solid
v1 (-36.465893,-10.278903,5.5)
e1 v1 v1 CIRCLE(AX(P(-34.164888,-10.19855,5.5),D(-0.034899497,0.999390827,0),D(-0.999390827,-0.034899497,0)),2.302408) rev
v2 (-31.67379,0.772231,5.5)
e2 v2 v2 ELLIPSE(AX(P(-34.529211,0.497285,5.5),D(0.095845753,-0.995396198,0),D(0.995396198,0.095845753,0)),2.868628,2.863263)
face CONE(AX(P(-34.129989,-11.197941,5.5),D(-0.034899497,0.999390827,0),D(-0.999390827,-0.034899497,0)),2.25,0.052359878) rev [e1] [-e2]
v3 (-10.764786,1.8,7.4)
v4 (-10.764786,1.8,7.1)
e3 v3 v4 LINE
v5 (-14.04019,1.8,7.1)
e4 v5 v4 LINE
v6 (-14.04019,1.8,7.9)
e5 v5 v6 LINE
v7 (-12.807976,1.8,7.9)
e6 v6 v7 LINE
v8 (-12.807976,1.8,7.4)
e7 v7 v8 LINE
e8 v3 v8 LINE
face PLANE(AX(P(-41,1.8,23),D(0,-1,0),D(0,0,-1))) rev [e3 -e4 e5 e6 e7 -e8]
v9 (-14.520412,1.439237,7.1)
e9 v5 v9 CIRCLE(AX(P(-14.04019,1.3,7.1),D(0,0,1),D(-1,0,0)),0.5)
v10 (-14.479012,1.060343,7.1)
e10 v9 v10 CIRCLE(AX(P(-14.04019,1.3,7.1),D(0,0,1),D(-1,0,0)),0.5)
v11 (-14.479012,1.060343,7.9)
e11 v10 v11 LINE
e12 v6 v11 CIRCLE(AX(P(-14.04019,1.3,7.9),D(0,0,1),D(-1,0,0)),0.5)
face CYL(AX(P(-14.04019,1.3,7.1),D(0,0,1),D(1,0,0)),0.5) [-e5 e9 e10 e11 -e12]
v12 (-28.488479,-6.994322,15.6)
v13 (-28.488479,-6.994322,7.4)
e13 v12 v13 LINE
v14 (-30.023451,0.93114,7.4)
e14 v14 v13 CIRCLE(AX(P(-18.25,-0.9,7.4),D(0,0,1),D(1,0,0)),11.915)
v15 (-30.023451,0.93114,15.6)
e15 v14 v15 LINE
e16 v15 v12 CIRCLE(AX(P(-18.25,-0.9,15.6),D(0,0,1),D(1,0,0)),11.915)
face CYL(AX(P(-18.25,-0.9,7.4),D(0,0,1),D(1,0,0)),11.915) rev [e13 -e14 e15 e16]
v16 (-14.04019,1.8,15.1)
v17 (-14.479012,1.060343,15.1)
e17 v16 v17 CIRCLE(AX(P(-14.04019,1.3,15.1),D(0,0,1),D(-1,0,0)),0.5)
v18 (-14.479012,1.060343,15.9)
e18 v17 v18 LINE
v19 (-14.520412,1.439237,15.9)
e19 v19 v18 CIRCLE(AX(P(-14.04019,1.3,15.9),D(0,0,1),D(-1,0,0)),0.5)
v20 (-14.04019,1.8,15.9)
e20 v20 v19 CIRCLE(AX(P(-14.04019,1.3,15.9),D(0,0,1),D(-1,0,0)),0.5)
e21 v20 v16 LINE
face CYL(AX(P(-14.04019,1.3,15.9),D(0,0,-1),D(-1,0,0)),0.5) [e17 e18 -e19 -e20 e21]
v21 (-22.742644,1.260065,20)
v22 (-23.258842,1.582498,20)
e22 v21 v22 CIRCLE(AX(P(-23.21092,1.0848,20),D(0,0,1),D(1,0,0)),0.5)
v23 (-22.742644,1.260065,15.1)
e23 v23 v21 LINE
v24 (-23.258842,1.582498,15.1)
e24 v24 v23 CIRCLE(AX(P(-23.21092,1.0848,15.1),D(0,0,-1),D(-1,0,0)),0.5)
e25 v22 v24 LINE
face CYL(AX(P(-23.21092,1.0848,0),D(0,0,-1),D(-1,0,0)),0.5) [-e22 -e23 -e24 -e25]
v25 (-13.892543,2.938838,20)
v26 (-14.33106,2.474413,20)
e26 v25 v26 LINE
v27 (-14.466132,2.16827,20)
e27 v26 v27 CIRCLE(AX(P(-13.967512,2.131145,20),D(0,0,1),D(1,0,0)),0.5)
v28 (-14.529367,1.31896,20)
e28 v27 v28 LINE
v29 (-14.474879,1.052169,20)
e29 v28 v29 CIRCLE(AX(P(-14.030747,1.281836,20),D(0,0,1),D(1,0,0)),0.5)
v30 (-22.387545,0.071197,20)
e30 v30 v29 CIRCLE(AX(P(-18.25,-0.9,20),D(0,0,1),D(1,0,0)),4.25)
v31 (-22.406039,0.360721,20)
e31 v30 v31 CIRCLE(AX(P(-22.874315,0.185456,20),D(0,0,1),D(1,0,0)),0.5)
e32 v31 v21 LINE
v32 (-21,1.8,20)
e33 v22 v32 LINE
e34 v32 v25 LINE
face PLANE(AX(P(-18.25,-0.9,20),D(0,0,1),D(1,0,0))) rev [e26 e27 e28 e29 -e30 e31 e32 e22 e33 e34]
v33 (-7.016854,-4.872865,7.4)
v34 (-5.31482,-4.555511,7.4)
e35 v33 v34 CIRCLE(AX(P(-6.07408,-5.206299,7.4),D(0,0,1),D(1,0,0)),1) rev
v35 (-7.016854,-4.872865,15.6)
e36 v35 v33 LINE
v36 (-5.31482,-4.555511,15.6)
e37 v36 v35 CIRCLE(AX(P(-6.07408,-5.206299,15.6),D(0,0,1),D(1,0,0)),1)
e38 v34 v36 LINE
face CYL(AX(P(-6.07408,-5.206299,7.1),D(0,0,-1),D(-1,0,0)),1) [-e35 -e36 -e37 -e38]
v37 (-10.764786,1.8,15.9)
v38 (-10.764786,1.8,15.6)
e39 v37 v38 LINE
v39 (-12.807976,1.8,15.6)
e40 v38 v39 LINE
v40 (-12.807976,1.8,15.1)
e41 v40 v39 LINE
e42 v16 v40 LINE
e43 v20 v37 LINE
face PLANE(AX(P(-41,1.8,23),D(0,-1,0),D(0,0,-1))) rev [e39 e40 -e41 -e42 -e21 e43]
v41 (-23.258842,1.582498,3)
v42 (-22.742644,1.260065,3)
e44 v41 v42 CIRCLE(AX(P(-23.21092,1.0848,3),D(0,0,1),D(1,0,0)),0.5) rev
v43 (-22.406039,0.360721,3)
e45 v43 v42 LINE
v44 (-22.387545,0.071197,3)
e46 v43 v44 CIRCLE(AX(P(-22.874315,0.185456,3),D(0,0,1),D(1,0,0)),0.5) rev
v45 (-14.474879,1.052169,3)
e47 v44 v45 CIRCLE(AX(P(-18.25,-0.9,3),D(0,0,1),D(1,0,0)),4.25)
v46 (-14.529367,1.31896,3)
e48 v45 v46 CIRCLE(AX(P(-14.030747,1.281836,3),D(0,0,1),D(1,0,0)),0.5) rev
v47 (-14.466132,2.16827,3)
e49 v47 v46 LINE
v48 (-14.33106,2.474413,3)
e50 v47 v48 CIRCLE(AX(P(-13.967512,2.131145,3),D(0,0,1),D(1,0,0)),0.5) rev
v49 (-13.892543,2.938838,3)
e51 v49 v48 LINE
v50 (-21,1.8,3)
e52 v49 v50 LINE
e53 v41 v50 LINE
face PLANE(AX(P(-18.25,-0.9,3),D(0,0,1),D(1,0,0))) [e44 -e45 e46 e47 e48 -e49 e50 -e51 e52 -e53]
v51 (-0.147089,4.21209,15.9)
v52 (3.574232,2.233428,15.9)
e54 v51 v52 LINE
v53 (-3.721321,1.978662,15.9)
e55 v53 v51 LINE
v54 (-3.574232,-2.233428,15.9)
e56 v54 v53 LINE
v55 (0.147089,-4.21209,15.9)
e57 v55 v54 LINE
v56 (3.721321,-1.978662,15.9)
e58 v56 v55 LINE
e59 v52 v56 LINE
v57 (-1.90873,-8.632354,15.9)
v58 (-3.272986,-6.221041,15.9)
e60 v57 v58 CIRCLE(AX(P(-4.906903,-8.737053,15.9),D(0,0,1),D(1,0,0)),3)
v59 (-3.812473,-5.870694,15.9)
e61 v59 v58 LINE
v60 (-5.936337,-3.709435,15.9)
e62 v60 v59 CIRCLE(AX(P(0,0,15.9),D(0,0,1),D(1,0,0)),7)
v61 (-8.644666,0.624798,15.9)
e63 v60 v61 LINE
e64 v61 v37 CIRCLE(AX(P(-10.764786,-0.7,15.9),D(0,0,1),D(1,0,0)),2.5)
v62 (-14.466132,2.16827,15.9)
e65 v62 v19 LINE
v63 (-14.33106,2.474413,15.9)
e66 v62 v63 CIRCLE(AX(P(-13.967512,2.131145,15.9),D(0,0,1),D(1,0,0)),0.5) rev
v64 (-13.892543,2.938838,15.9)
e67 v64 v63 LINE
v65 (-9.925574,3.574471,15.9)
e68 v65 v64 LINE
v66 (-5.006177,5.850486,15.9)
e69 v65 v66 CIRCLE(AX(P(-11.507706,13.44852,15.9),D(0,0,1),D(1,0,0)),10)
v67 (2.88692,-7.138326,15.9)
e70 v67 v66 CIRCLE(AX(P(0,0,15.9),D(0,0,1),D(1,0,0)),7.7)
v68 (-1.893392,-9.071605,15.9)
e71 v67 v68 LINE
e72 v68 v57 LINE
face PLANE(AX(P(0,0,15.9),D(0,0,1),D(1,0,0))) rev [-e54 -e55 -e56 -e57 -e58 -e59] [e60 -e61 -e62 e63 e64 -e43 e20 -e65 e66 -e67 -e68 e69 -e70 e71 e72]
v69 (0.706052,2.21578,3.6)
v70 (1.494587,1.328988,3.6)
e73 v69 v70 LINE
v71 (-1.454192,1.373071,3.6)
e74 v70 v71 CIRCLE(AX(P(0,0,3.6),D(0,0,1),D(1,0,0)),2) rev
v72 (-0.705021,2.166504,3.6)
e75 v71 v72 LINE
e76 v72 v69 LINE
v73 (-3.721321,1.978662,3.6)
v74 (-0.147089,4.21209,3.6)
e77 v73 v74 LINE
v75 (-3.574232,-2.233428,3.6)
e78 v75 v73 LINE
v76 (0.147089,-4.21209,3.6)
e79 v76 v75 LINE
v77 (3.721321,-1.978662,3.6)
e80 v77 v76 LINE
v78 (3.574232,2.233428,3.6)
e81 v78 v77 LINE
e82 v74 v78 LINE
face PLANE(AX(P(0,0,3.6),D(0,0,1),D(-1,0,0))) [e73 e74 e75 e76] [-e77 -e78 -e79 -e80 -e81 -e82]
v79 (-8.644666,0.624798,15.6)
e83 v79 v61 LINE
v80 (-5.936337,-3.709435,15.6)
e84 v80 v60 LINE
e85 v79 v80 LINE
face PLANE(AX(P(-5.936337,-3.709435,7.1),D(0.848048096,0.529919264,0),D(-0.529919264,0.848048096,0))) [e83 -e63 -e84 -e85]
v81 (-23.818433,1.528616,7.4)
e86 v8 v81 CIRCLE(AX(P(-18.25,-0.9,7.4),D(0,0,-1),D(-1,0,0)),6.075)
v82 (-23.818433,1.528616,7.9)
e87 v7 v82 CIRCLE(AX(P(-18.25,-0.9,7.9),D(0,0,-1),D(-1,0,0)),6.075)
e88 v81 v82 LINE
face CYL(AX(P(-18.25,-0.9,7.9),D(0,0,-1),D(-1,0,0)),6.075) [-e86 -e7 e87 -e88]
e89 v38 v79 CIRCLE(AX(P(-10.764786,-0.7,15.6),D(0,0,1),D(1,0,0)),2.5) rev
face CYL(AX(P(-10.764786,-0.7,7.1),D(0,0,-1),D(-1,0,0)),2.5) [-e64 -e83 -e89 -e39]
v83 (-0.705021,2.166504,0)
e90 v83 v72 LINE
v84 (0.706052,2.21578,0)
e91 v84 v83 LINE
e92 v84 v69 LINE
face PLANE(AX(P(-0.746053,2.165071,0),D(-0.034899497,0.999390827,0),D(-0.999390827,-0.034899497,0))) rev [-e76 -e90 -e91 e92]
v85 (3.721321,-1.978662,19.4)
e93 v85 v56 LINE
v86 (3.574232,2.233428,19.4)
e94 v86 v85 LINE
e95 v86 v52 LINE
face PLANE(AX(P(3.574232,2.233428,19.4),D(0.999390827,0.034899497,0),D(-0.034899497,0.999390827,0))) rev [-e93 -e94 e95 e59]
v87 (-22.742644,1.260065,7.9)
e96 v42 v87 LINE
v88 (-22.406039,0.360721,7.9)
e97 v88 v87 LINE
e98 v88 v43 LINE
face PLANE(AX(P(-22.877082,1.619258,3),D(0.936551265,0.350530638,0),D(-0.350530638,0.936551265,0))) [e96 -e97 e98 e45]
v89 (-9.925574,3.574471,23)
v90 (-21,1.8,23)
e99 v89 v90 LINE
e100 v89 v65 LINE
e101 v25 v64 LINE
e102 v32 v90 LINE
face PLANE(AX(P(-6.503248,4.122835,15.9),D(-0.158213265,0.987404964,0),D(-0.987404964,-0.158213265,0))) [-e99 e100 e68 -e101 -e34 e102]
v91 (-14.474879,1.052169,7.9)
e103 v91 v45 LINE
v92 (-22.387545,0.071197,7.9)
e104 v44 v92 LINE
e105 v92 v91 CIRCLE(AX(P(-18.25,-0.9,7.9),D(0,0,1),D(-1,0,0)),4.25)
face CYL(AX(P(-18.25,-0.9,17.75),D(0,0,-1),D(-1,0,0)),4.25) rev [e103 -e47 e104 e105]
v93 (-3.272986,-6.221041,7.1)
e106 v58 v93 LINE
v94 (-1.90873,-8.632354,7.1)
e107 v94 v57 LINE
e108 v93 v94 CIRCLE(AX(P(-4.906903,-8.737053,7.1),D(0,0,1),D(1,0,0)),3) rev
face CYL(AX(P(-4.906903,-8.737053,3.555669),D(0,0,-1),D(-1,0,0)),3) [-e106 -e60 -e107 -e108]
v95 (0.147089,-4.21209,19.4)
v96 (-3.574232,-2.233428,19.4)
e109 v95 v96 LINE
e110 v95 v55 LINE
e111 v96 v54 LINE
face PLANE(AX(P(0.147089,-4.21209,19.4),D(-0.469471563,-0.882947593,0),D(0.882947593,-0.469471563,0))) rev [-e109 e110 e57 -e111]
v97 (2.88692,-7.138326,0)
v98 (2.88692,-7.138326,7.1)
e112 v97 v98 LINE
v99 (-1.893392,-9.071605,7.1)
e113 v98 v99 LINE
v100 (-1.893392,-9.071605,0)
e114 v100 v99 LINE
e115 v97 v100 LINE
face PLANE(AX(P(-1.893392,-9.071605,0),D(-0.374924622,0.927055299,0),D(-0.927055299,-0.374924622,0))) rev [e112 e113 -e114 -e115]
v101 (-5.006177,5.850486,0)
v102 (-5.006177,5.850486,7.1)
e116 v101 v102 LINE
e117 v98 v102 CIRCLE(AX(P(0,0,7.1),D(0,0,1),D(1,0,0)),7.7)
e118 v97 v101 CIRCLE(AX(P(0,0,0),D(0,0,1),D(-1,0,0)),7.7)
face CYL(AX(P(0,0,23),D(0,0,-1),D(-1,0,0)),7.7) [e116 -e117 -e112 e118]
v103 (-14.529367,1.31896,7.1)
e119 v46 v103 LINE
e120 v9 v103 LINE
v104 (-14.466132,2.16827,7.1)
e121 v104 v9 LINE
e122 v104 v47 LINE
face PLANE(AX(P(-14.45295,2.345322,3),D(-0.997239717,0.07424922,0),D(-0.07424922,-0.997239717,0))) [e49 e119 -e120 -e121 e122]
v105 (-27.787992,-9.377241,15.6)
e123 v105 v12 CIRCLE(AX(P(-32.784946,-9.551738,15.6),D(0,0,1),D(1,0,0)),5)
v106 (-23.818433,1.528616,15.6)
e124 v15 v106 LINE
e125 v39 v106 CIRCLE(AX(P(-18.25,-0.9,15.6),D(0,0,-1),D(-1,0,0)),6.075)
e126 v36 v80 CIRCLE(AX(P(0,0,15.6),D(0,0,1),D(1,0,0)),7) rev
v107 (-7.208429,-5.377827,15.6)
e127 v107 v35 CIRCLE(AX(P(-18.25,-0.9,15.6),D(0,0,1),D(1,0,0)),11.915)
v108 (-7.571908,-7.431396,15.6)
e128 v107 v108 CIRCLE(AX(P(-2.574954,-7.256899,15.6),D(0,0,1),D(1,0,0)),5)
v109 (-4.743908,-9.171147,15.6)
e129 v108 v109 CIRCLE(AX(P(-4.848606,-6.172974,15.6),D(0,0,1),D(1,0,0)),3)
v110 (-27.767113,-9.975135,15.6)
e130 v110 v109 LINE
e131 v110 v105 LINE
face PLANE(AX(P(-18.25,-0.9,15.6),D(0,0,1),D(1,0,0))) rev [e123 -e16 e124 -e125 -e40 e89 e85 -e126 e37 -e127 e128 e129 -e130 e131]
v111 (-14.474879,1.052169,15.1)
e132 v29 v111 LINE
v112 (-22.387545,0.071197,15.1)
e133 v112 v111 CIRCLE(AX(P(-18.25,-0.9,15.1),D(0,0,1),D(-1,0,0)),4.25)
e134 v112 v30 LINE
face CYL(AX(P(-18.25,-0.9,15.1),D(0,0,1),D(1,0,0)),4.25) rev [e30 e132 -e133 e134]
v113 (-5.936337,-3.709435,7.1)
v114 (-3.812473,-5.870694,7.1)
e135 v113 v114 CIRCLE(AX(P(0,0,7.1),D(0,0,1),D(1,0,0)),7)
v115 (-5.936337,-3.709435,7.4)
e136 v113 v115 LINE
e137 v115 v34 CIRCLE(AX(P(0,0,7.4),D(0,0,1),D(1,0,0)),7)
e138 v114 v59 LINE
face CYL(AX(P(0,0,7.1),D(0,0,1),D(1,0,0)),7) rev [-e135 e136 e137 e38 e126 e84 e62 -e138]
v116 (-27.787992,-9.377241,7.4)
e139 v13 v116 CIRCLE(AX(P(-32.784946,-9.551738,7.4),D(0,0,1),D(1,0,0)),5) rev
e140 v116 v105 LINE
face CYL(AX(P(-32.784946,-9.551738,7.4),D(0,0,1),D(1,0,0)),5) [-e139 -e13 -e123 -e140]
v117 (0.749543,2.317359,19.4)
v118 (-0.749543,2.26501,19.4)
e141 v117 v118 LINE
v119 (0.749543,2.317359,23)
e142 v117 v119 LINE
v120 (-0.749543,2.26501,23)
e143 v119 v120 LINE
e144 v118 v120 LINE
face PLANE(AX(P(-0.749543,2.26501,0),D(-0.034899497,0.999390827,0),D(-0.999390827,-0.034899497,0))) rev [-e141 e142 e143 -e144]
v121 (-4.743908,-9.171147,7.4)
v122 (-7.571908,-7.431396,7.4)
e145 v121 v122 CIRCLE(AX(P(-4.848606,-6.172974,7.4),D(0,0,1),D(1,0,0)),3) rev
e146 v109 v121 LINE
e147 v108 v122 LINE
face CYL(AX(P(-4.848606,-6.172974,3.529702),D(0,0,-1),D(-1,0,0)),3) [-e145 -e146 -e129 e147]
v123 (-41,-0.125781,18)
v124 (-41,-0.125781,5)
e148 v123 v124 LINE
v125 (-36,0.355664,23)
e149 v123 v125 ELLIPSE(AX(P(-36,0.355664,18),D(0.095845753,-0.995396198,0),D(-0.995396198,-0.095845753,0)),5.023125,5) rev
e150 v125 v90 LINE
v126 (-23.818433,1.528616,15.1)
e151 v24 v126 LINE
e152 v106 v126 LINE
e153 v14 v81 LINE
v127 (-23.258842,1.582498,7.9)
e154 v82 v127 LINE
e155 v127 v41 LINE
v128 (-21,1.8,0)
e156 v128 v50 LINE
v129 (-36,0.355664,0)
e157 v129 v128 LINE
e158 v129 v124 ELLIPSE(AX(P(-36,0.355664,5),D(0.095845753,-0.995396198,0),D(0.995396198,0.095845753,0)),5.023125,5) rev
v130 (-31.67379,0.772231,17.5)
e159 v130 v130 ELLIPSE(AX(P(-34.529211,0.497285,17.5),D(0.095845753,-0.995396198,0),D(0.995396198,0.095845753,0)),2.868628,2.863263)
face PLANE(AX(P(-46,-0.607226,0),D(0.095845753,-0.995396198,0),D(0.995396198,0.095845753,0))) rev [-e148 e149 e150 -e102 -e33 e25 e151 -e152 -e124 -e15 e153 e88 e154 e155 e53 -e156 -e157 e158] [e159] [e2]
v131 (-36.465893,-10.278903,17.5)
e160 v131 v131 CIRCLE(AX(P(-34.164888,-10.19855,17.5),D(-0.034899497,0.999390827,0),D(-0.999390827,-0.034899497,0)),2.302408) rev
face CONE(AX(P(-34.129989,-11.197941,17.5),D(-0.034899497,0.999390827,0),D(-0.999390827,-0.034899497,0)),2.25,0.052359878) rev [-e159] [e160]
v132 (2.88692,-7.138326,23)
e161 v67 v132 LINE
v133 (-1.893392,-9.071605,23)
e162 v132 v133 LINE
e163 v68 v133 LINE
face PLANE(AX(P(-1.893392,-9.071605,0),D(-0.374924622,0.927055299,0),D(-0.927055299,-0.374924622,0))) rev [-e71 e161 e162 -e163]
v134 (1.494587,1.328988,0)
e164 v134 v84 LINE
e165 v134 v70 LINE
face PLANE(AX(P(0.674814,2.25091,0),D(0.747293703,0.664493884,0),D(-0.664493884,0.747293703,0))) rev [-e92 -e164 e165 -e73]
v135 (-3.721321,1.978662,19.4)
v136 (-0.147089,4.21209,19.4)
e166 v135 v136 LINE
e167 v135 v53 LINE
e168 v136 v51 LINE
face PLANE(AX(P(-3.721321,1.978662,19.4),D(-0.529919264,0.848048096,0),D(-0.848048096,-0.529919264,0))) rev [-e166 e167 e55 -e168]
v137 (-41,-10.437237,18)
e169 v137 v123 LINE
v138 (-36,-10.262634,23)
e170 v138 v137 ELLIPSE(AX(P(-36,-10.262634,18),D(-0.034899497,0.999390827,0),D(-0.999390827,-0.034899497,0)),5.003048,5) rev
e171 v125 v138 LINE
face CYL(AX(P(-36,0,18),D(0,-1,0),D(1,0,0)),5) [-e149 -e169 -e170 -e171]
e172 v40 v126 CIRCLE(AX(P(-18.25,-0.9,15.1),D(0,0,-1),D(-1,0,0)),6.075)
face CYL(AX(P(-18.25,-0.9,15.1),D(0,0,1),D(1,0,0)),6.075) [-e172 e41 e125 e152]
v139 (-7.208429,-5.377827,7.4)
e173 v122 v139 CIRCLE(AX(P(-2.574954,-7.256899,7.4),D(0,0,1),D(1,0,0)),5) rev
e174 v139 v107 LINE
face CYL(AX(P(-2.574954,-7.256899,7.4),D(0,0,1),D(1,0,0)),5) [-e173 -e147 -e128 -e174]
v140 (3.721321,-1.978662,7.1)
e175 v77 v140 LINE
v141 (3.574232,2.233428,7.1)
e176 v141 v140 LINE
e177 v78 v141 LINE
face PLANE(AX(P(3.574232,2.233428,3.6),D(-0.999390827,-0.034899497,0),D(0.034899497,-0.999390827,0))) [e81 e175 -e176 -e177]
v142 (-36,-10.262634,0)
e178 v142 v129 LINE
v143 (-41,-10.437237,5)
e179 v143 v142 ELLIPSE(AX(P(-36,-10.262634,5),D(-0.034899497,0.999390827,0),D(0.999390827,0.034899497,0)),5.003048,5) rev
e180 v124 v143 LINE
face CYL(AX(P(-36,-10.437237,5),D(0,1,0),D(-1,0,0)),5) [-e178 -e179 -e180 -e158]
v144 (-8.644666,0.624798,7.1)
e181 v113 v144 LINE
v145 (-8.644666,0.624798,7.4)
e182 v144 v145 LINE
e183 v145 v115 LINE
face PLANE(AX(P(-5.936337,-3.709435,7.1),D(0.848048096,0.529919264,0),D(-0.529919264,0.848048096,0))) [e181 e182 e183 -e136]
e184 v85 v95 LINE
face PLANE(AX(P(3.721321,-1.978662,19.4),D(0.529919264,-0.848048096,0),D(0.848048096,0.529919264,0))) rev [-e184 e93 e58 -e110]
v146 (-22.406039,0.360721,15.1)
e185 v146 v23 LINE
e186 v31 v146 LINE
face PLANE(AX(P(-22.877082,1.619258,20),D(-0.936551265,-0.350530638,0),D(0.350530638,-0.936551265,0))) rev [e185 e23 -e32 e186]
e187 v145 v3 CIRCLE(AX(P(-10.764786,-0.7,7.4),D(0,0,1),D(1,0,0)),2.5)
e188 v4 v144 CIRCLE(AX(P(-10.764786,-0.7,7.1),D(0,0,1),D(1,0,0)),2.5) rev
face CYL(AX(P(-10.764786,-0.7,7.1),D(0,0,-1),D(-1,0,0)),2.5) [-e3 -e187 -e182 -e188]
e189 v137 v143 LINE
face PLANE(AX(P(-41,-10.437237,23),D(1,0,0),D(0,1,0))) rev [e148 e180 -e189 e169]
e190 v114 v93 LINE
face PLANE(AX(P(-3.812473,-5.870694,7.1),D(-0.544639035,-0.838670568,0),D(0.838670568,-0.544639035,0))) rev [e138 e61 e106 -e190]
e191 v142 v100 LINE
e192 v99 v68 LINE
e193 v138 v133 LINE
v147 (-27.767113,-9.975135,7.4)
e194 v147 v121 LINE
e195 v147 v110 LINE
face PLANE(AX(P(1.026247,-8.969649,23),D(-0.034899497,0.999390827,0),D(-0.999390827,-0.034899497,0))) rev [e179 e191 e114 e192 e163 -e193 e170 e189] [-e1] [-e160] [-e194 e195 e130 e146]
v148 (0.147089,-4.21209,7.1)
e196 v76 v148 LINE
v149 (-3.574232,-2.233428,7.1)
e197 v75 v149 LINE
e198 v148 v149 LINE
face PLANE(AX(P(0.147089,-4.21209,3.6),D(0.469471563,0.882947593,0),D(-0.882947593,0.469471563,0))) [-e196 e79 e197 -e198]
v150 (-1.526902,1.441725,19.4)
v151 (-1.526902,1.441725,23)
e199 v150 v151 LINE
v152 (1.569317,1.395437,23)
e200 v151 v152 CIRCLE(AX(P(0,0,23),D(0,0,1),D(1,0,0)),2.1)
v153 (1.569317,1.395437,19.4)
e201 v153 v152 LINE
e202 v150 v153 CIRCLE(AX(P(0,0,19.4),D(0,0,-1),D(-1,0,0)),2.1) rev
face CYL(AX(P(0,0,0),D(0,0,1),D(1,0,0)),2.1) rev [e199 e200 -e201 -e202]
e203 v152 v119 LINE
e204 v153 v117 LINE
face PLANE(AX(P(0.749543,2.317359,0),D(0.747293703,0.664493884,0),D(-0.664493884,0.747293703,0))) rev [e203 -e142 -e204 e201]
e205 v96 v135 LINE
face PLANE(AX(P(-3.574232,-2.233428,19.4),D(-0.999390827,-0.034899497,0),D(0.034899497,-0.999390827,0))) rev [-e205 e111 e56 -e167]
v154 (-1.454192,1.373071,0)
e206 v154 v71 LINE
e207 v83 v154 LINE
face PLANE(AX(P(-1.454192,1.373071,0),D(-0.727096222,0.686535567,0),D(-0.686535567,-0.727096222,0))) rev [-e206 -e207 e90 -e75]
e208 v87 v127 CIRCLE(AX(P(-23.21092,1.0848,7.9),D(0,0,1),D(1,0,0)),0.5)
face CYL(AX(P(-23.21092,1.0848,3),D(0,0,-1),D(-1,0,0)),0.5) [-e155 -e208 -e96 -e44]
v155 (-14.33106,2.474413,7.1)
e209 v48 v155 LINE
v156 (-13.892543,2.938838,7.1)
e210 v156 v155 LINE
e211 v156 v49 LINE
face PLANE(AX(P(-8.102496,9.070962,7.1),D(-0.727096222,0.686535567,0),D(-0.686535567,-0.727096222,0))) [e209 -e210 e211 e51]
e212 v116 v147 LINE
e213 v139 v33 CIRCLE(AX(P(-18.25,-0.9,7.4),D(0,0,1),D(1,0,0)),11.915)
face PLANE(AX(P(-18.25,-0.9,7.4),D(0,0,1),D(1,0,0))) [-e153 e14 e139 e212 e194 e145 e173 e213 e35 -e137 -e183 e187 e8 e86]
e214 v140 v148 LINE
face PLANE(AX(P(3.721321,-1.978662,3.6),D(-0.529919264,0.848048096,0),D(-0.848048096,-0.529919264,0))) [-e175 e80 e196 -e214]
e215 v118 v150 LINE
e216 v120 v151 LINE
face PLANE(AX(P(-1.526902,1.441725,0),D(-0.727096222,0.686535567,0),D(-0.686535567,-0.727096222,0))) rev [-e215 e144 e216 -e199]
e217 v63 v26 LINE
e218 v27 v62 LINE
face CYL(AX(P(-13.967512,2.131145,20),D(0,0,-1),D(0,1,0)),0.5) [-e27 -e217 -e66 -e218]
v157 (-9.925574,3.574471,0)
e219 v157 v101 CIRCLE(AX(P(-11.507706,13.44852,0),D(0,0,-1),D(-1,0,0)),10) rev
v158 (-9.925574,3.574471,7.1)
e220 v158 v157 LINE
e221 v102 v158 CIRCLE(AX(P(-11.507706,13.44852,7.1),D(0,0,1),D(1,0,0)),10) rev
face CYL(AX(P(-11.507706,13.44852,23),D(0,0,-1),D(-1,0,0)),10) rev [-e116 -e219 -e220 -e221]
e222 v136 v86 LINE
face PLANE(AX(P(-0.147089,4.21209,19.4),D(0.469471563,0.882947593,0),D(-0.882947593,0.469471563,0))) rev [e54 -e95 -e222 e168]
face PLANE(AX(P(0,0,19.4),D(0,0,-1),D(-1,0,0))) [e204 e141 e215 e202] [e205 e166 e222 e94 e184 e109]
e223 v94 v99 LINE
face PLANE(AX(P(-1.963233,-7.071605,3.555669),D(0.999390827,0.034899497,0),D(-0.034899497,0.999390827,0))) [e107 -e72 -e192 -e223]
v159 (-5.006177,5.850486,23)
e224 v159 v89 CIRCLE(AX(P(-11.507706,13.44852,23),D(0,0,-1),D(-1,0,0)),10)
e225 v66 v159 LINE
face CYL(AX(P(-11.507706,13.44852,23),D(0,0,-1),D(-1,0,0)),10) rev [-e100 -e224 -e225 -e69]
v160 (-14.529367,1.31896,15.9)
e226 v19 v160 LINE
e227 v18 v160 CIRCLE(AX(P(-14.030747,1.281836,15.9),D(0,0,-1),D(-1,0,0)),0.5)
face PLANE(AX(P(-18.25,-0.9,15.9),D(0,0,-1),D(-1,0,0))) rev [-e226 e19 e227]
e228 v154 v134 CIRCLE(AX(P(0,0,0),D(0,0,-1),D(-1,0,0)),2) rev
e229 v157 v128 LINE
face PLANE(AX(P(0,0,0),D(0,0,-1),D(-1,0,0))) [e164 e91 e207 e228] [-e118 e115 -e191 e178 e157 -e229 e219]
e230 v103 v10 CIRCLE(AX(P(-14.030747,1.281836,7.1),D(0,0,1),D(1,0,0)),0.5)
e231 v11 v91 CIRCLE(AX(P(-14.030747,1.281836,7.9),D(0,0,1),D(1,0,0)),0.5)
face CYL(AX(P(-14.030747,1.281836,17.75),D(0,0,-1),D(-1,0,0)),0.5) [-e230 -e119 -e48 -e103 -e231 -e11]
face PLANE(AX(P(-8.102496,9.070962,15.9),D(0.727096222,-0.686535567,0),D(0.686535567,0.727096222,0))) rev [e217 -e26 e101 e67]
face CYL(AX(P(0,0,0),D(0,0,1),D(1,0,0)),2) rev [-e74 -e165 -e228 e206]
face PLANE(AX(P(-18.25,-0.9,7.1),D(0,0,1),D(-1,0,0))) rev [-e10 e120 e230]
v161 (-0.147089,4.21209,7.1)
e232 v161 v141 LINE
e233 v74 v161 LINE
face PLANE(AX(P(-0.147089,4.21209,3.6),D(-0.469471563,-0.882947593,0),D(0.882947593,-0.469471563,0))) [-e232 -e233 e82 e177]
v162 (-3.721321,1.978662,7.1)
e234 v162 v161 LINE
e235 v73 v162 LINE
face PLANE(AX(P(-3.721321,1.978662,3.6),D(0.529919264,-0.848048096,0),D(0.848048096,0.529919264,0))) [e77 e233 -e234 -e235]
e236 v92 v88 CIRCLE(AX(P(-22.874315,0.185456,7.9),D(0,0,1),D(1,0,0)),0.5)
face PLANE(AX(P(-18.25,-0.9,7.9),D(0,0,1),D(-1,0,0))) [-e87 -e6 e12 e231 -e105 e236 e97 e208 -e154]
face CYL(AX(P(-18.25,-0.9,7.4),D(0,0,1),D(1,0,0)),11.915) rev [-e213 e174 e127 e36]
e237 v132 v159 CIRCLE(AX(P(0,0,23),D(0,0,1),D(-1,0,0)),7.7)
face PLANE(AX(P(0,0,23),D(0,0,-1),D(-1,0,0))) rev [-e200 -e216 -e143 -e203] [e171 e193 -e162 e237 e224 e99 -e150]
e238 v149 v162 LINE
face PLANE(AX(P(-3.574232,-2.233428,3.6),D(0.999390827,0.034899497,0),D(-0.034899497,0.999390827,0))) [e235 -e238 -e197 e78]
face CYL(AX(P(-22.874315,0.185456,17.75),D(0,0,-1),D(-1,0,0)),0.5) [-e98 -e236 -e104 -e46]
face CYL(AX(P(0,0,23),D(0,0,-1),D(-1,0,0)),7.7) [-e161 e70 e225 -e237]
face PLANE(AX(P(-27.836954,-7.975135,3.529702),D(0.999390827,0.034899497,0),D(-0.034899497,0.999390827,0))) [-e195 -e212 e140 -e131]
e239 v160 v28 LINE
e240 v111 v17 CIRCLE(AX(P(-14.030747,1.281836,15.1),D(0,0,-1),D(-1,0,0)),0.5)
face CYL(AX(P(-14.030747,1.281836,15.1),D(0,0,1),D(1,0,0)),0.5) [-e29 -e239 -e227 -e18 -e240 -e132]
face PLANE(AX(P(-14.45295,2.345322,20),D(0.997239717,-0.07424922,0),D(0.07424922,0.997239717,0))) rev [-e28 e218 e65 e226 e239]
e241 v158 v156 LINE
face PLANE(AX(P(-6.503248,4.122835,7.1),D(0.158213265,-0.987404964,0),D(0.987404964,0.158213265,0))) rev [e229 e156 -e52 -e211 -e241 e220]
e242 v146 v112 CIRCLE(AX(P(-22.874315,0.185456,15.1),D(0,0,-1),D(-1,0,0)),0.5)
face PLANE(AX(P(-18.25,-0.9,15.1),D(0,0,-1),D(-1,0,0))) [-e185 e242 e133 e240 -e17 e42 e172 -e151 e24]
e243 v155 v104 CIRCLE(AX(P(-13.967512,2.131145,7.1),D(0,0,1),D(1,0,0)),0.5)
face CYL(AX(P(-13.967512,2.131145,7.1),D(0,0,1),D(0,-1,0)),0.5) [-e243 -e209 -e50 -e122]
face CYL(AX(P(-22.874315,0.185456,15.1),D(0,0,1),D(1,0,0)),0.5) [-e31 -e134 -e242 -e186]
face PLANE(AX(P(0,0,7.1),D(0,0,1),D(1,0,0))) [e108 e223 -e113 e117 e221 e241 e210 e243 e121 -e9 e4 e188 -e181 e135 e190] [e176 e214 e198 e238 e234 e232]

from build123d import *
from build123d.topology import SkipClean

# Parameters (mm, degrees)
SALIENTE_EXTRUIR1_DEPTH         = 23
CORTAR_EXTRUIR1_DEPTH           = 4.4
CROQUIS4_R                      = 2.1
CORTAR_EXTRUIR3_DEPTH           = 49.155331227
CORTAR_EXTRUIR11_DEPTH          = 49.155331227
CROQUIS5_R                      = 11.915
CORTAR_EXTRUIR4_DEPTH           = 4.1
SALIENTE_EXTRUIR2_DEPTH         = 0.5
CROQUIS7_R                      = 4.25
CORTAR_EXTRUIR5_DEPTH           = 6.25
CORTAR_EXTRUIR7_DEPTH           = 3.5
CROQUIS10_R                     = 2.25
CORTAR_EXTRUIR8_DEPTH           = 53.746474455
CORTAR_EXTRUIR8_DRAFT           = -3
CORTAR_EXTRUIR8_PROFILE_2_DEPTH = 53.746474455
CORTAR_EXTRUIR8_PROFILE_2_DRAFT = -3
REDONDEO1_R                     = 5
REDONDEO2_R                     = 2.5
REDONDEO7_R                     = 5
REDONDEO11_R                    = 1
CORTAR_EXTRUIR13_DEPTH          = 8.8
REDONDEO12_R                    = 3
CORTAR_EXTRUIR14_DEPTH          = 8.2
REDONDEO13_R                    = 5
MOVER_CARA1_BY                  = 0.1
MOVER_CARA1_2_BY                = 0.1
MOVER_CARA1_3_BY                = 0.1
MOVER_CARA1_4_BY                = 0.1
CORTAR_EXTRUIR16_DEPTH          = 8.5
CORTAR_EXTRUIR21_DEPTH          = 49.155331227
REDONDEO18_R                    = 3
CORTAR_EXTRUIR24_DEPTH          = 49.155331227
SALIENTE_EXTRUIR10_DEPTH        = 7.1
CROQUIS40_W                     = 6.032148686
CROQUIS40_H                     = 4.1
CORTAR_EXTRUIR25_DEPTH          = 10
REDONDEO21_R                    = 10
CORTAR_EXTRUIR27_DEPTH          = 4.9
CORTAR_EXTRUIR28_DEPTH          = 0.8
CORTAR_EXTRUIR29_DEPTH          = 4.1
REDONDEO21_OF_SIMETR_A4_R       = 10
REDONDEO22_R                    = 0.5
REDONDEO23_R                    = 0.5


with BuildPart() as part:
    # Croquis1 → Saliente-Extruir1 (new body)
    with BuildSketch(Plane.XY):
        with BuildLine():
            Line((1.026246547, -8.96964858), (-41, -10.437237448))
            Line((-41, -10.437237448), (-41, 1.8))
            Line((-41, 1.8), (-7.486654794, 1.8))
            ThreePointArc((-7.486654794, 1.8), (4.166571915, 6.475313002), (4.74059336, -6.067682803))
            Line((4.74059336, -6.067682803), (1.026246547, -8.96964858))
        make_face()
    extrude(amount=SALIENTE_EXTRUIR1_DEPTH)

    # Croquis2 → Cortar-Extruir1 (cut, symmetric)
    with BuildSketch(Plane.XY.offset(11.5)):
        with BuildLine():
            Line((-5.936336673, -3.70943485), (-9.720717172, 2.346839933))
            ThreePointArc((-9.720717172, 2.346839933), (7.132504492, 7.009092643), (2.176832591, -9.760194664))
            Line((2.176832591, -9.760194664), (-3.812473245, -5.870693976))
            ThreePointArc((-3.812473245, -5.870693976), (-4.992753144, -4.90636485), (-5.936336673, -3.70943485))
        make_face()
    extrude(amount=CORTAR_EXTRUIR1_DEPTH, both=True, mode=Mode.SUBTRACT)

    # Croquis4 → Cortar-Extruir3 (cut, through all)
    with BuildSketch(Plane.XY.offset(23)):
        Circle(CROQUIS4_R)
    extrude(amount=-CORTAR_EXTRUIR3_DEPTH, mode=Mode.SUBTRACT)

    # Croquis15 → Cortar-Extruir11 (cut, through all)
    with BuildSketch(Plane.XY.offset(23)):
        with BuildLine():
            Line((-1.526902065, 1.441724691), (-0.74954312, 2.265010153))
            Line((-0.74954312, 2.265010153), (0.74954312, 2.317359398))
            Line((0.74954312, 2.317359398), (1.569316776, 1.395437156))
            ThreePointArc((1.569316776, 1.395437156), (0.031390857, 2.099765371), (-1.526902065, 1.441724691))
        make_face()
    extrude(amount=-CORTAR_EXTRUIR11_DEPTH, mode=Mode.SUBTRACT)

    # Croquis5 → Cortar-Extruir4 (cut, symmetric)
    with BuildSketch(Plane.XY.offset(11.5)):
        with Locations((-18.25, -0.9)):
            Circle(CROQUIS5_R)
    extrude(amount=CORTAR_EXTRUIR4_DEPTH, both=True, mode=Mode.SUBTRACT)

    # Croquis6 → Saliente-Extruir2 (add)
    with BuildSketch(Plane(origin=(0, 0, 15.6), x_dir=(-1, 0, 0), z_dir=(0, 0, -1))):
        with BuildLine():
            Line((12.80797602, 1.8), (14.967851314, 1.8))
            ThreePointArc((14.967851314, 1.8), (18.25, -5.15), (21.532148686, 1.8))
            Line((21.532148686, 1.8), (23.69202398, 1.8))
            ThreePointArc((23.69202398, 1.8), (18.25, -6.975), (12.80797602, 1.8))
        make_face()
    saliente_extruir2 = extrude(amount=SALIENTE_EXTRUIR2_DEPTH)

    # Croquis7 → Cortar-Extruir5 (cut, symmetric)
    with SkipClean():  # the faces are left unmerged after this step: merging them gives an invalid solid
        with BuildSketch(Plane(origin=(0, 0, 11.5), x_dir=(-1, 0, 0), z_dir=(0, 0, -1))):
            with Locations((18.25, -0.9)):
                Circle(CROQUIS7_R)
        cortar_extruir5 = extrude(amount=CORTAR_EXTRUIR5_DEPTH, both=True, mode=Mode.SUBTRACT)
    add(part.part.scale(1), mode=Mode.REPLACE)  # the faces are merged on a copy

    # Croquis9 → Cortar-Extruir7 (cut)
    with BuildSketch(Plane(origin=(0, 0, 15.9), x_dir=(-1, 0, 0), z_dir=(0, 0, -1))):
        Polygon((-3.574231815, 2.233427918), (-3.721321222, -1.978661592), (-0.147089407, -4.21208951), (3.574231815, -2.233427918), (3.721321222, 1.978661592), (0.147089407, 4.21208951), align=None)
    cortar_extruir7 = extrude(amount=-CORTAR_EXTRUIR7_DEPTH, mode=Mode.SUBTRACT)

    # Simetría2: Saliente-Extruir2, Cortar-Extruir5, Cortar-Extruir7 across plane
    with SkipClean():  # the faces are left unmerged after this step: merging them gives an invalid solid
        add(saliente_extruir2.mirror(Plane.XY.offset(11.5)))
        add(cortar_extruir5.mirror(Plane.XY.offset(11.5)), mode=Mode.SUBTRACT)
        add(cortar_extruir7.mirror(Plane.XY.offset(11.5)), mode=Mode.SUBTRACT)
    add(part.part.scale(1), mode=Mode.REPLACE)  # the faces are merged on a copy


with BuildPart() as cortar_extruir8_tool:
    # Croquis10 → Cortar-Extruir8 (with draft: the straight prism first)
    with BuildSketch(Plane(origin=(1.359936523, -9.958605413, -3), x_dir=(-0.999390827019096, -0.034899496702497465, 0), z_dir=(-0.034899496702497465, 0.999390827019096, 0))):
        with Locations((35.51155777, 8.5)):
            Circle(CROQUIS10_R)
    extrude(amount=CORTAR_EXTRUIR8_DEPTH)
    # Cortar-Extruir8: the draft: its side faces are tilted about the plane it starts from
    cortar_extruir8_sides = [cortar_extruir8_tool.faces().sort_by_distance(p)[0] for p in [
        (-32.819221658, 15.737449738, 5.5),
    ]]
    draft(cortar_extruir8_sides, Plane(origin=(1.359936523, -9.958605413, -3), x_dir=(-0.999390827019096, -0.034899496702497465, 0), z_dir=(-0.034899496702497465, 0.999390827019096, 0)), CORTAR_EXTRUIR8_DRAFT)


with BuildPart() as part_1:
    add(part.part)

    # Cortar-Extruir8: cut by cortar_extruir8_tool
    add(cortar_extruir8_tool.part, mode=Mode.SUBTRACT)


with BuildPart() as cortar_extruir8_profile_2_tool:
    # Croquis10 → Cortar-Extruir8 profile 2 (with draft: the straight prism first)
    with BuildSketch(Plane(origin=(1.359936523, -9.958605413, -3), x_dir=(-0.999390827019096, -0.034899496702497465, 0), z_dir=(-0.034899496702497465, 0.999390827019096, 0))):
        with Locations((35.51155777, 20.5)):
            Circle(CROQUIS10_R)
    extrude(amount=CORTAR_EXTRUIR8_PROFILE_2_DEPTH)
    # Cortar-Extruir8 profile 2: the draft: its side faces are tilted about the plane it starts from
    cortar_extruir8_profile_2_sides = [cortar_extruir8_profile_2_tool.faces().sort_by_distance(p)[0] for p in [
        (-32.819221658, 15.737449738, 17.5),
    ]]
    draft(cortar_extruir8_profile_2_sides, Plane(origin=(1.359936523, -9.958605413, -3), x_dir=(-0.999390827019096, -0.034899496702497465, 0), z_dir=(-0.034899496702497465, 0.999390827019096, 0)), CORTAR_EXTRUIR8_PROFILE_2_DRAFT)


with BuildPart() as part_2:
    add(part_1.part)

    # Cortar-Extruir8 profile 2: cut by cortar_extruir8_profile_2_tool
    add(cortar_extruir8_profile_2_tool.part, mode=Mode.SUBTRACT)

    # Redondeo1
    redondeo1_edges = [part_2.edges().sort_by_distance(p)[0] for p in [
        (-7.486654794, 1.8, 3.55),
        (-7.486654794, 1.8, 19.45),
    ]]
    fillet(redondeo1_edges, radius=REDONDEO1_R)

    # Redondeo2
    # the kernel refuses this fillet: 2.5 mm, written as the material it takes off along each edge
    with BuildSketch(Plane(origin=(-9.477934737, 1.95830682, 11.66888847), x_dir=(-0.9925180140171804, -0.12209828766773127, 0), z_dir=(0, 0, 1)), Plane(origin=(-9.477934737, 1.95830682, 7.1), x_dir=(-0.9925180140171804, -0.12209828766773127, 0), z_dir=(0, 0, 1))) as redondeo2_piece_1:
        with BuildLine():
            CenterArc((1.601798054, 2.481295035), REDONDEO2_R, 204.986783762, 58)
            Line((-0.664215063, 1.425272047), (-0.890816375, 1.319669748))
            Line((-0.890816375, 1.319669748), (-0.226601312, -0.105602299))
            Line((-0.226601312, -0.105602299), (0.032385005, -0.247893549))
            ThreePointArc((0.032385005, -0.247893549), (1.22766696, -0.243410407), (1.266027763, -0.248129504))
            Line((1.266027763, -0.248129504), (1.296552335, 0))
        make_face()
    extrude(amount=4.23111153, mode=Mode.SUBTRACT)

    # Redondeo7
    redondeo7_edges = [part_2.edges().sort_by_distance(p)[0] for p in [
        (-41, -4.318618724, 23),
        (-41, -4.318618724, 0),
    ]]
    fillet(redondeo7_edges, radius=REDONDEO7_R)

    # Redondeo11
    # the kernel refuses this fillet: 1 mm, written as the material it takes off along each edge
    with BuildSketch(Plane(origin=(-6.491004214, -2.821781232, 7.4), x_dir=(-0.24834471641059566, -0.9686717203629621, 0), z_dir=(0, 0, 1))) as redondeo11_piece_1:
        with BuildLine():
            CenterArc((2.206273853, 0.996044557), REDONDEO11_R, 144.980572928, 119.921677826)
            Line((1.387316336, 1.569898707), (1.305420584, 1.627284122))
            ThreePointArc((1.305420584, 1.627284122), (0.649703597, 0.826722603), (-0.072392607, 0.068987756))
            Line((-0.072392607, 0.068987756), (0.008885517, -0.099604456))
            ThreePointArc((0.008885517, -0.099604456), (1.058709342, -0.052870893), (2.108533166, -0.099604456))
            Line((2.108533166, -0.099604456), (2.117418683, 0))
        make_face()
    extrude(amount=8.2, mode=Mode.SUBTRACT)

    # Croquis18 → Cortar-Extruir13 (cut)
    with SkipClean():  # the faces are left unmerged after this step: merging them gives an invalid solid
        with BuildSketch(Plane(origin=(0, 0, 15.9), x_dir=(-1, 0, 0), z_dir=(0, 0, -1))):
            Polygon((1.963233069, -7.071604588), (-0.962904484, -8.971860533), (1.89339153, -9.071604588), align=None)
        extrude(amount=CORTAR_EXTRUIR13_DEPTH, mode=Mode.SUBTRACT)

    # Redondeo12
    redondeo12_edges = [part_2.edges().sort_by_distance(p)[0] for p in [
        (-1.963233069, -7.071604588, 11.5),
    ]]
    fillet(redondeo12_edges, radius=REDONDEO12_R)

    # Croquis19 → Cortar-Extruir14 (cut)
    with BuildSketch(Plane(origin=(0, 0, 15.6), x_dir=(-1, 0, 0), z_dir=(0, 0, -1))):
        with BuildLine():
            Line((7.507784355, -9.267663506), (7.612546663, -6.267663506))
            ThreePointArc((7.612546663, -6.267663506), (8.606937748, -7.898469504), (9.849140871, -9.349425477))
            Line((9.849140871, -9.349425477), (7.507784355, -9.267663506))
        make_face()
        with BuildLine():
            Line((27.83695426, -7.975134841), (27.767112721, -9.975134841))
            Line((27.767112721, -9.975134841), (26.040992932, -9.91485741))
            ThreePointArc((26.040992932, -9.91485741), (26.992933893, -8.994957192), (27.83695426, -7.975134841))
        make_face()
    extrude(amount=CORTAR_EXTRUIR14_DEPTH, mode=Mode.SUBTRACT)

    # Redondeo13
    redondeo13_edges = [part_2.edges().sort_by_distance(p)[0] for p in [
        (-7.612546663, -6.267663506, 11.5),
        (-27.83695426, -7.975134841, 11.5),
    ]]
    fillet(redondeo13_edges, radius=REDONDEO13_R)

    # Mover cara1: a face moved outward by 0.1
    extrude(part_2.faces().sort_by_distance((1.159429948, 1.856398277, 1.8))[0], amount=MOVER_CARA1_BY, dir=(-0.747293703, -0.664493884, 0))

    # Mover cara1 2: a face moved outward by 0.1
    extrude(part_2.faces().sort_by_distance((0, 2.291184775, 1.8))[0], amount=MOVER_CARA1_2_BY, dir=(0.034899497, -0.999390827, 0))

    # Mover cara1 3: a face moved outward by 0.1
    extrude(part_2.faces().sort_by_distance((-1.138222593, 1.853367422, 1.8))[0], amount=MOVER_CARA1_3_BY, dir=(0.727096222, -0.686535567, 0))

    # Mover cara1 4: a curved face moved outward by 0.1
    add(Solid.thicken(part_2.faces().sort_by_distance((-0.031390857, -2.099765371, 1.8))[0], MOVER_CARA1_4_BY))

    # Croquis27 → Cortar-Extruir16 (cut, symmetric)
    with BuildSketch(Plane.XY.offset(11.5)):
        with BuildLine():
            Line((-14.967851314, 1.8), (-21.532148686, 1.8))
            ThreePointArc((-21.532148686, 1.8), (-18.25, -5.15), (-14.967851314, 1.8))
        make_face()
    extrude(amount=CORTAR_EXTRUIR16_DEPTH, both=True, mode=Mode.SUBTRACT)

    # Croquis35 → Cortar-Extruir21 (cut, through all)
    with BuildSketch(Plane.XY.offset(23)):
        with BuildLine():
            Line((-1.89339153, -9.071604588), (2.886919592, -7.138325803))
            ThreePointArc((2.886919592, -7.138325803), (3.85114367, -6.66773518), (4.74059336, -6.067682803))
            Line((4.74059336, -6.067682803), (1.026246547, -8.96964858))
            Line((1.026246547, -8.96964858), (-1.89339153, -9.071604588))
        make_face()
    extrude(amount=-CORTAR_EXTRUIR21_DEPTH, mode=Mode.SUBTRACT)

    # Redondeo18
    # the kernel refuses this fillet: 3 mm, written as the material it takes off along each edge
    with BuildSketch(Plane(origin=(-7.507784355, -9.267663506, 15.6), x_dir=(-0.03489949670249421, 0.999390827019096, 0), z_dir=(0, 0, -1))) as redondeo18_piece_1:
        with BuildLine():
            CenterArc((3, 2.765561458), REDONDEO18_R, 180, 67.198620204)
            Line((0, 2.765561458), (0, 0))
            Line((0, 0), (1.83738664, 0))
        make_face()
    extrude(amount=8.2, mode=Mode.SUBTRACT)

    # Croquis38 → Cortar-Extruir24 (cut, through all)
    with SkipClean():  # the faces are left unmerged after this step: merging them gives an invalid solid
        with BuildSketch(Plane.XY.offset(23)):
            Polygon((-46, -0.607226205), (-21, 1.8), (-46.23178952, 1.8), align=None)
        extrude(amount=-CORTAR_EXTRUIR24_DEPTH, mode=Mode.SUBTRACT)
    add(part_2.part.scale(1), mode=Mode.REPLACE)  # the faces are merged on a copy

    # Croquis39 → Saliente-Extruir10 (add)
    with BuildSketch(Plane.XY.offset(23)):
        with BuildLine():
            Line((-6.503247995, 4.122834646), (-21, 1.8))
            Line((-21, 1.8), (-10.726136303, 1.8))
            ThreePointArc((-10.726136303, 1.8), (-8.316346559, 2.41902826), (-6.503247995, 4.122834646))
        make_face()
    saliente_extruir10 = extrude(amount=-SALIENTE_EXTRUIR10_DEPTH)

    # Croquis40 → Cortar-Extruir25 (cut, along a direction that is not the sketch's normal)
    with BuildSketch(Plane.XZ.offset(-1.8)):
        with Locations((-17.983925657, 17.95)):
            Rectangle(CROQUIS40_W, CROQUIS40_H)
    cortar_extruir25 = extrude(amount=-CORTAR_EXTRUIR25_DEPTH, dir=(-0.686535566929956, -0.727096221514157, 0), mode=Mode.SUBTRACT)

    # Redondeo21
    # the kernel refuses this fillet: 10 mm, written as the material it adds along each edge
    with BuildSketch(Plane(origin=(-6.503247995, 4.122834646, 15.9), x_dir=(-0.987404963998654, -0.15821326452234308, 0), z_dir=(0, 0, 1))) as redondeo21_piece_1:
        with BuildLine():
            CenterArc((3.465979652, -10), REDONDEO21_R, 90, 31.449927224)
            ThreePointArc((-1.751552481, -1.469035316), (-0.82095501, -0.79988182), (0, 0))
            Line((0, 0), (3.465979652, 0))
        make_face()
    extrude(amount=7.1)

    # Croquis42 → Cortar-Extruir27 (cut)
    with SkipClean():  # the faces are left unmerged after this step: merging them gives an invalid solid
        with BuildSketch(Plane(origin=(0, 0, 15.1), x_dir=(-1, 0, 0), z_dir=(0, 0, -1))):
            with BuildLine():
                Line((22.877081636, 1.619257596), (22.351285679, 0.214430699))
                ThreePointArc((22.351285679, 0.214430699), (22.042148108, 1.018883197), (21.577081636, 1.744433359))
                Line((21.577081636, 1.744433359), (22.877081636, 1.619257596))
            make_face()
        cortar_extruir27 = extrude(amount=-CORTAR_EXTRUIR27_DEPTH, mode=Mode.SUBTRACT)

    # Croquis43 → Cortar-Extruir28 (cut)
    with SkipClean():  # the faces are left unmerged after this step: merging them gives an invalid solid
        with BuildSketch(Plane(origin=(0, 0, 15.1), x_dir=(-1, 0, 0), z_dir=(0, 0, -1))):
            with BuildLine():
                Line((14.967851314, 1.8), (14.040190028, 1.8))
                ThreePointArc((14.040190028, 1.8), (14.46785197, 1.559046836), (14.48332792, 1.068421053))
                ThreePointArc((14.48332792, 1.068421053), (14.706658288, 1.446748711), (14.967851314, 1.8))
            make_face()
        cortar_extruir28 = extrude(amount=-CORTAR_EXTRUIR28_DEPTH, mode=Mode.SUBTRACT)

    # Croquis44 → Cortar-Extruir29 (cut)
    with SkipClean():  # the faces are left unmerged after this step: merging them gives an invalid solid
        with BuildSketch(Plane(origin=(0, 0, 15.9), x_dir=(-1, 0, 0), z_dir=(0, 0, -1))):
            with BuildLine():
                Line((14.452949638, 2.345322166), (14.967851314, 1.8))
                ThreePointArc((14.967851314, 1.8), (14.740019054, 1.496358438), (14.540190028, 1.173598315))
                Line((14.540190028, 1.173598315), (14.452949638, 2.345322166))
            make_face()
        cortar_extruir29 = extrude(amount=-CORTAR_EXTRUIR29_DEPTH, mode=Mode.SUBTRACT)

    # Simetría4: Saliente-Extruir10, Cortar-Extruir25, Cortar-Extruir27, Cortar-Extruir28, Cortar-Extruir29 across plane
    with SkipClean():  # the faces are left unmerged after this step: merging them gives an invalid solid
        add(saliente_extruir10.mirror(Plane.XY.offset(11.5)))
        add(cortar_extruir25.mirror(Plane.XY.offset(11.5)), mode=Mode.SUBTRACT)
        add(cortar_extruir27.mirror(Plane.XY.offset(11.5)), mode=Mode.SUBTRACT)
        add(cortar_extruir28.mirror(Plane.XY.offset(11.5)), mode=Mode.SUBTRACT)
        add(cortar_extruir29.mirror(Plane.XY.offset(11.5)), mode=Mode.SUBTRACT)

    # Redondeo21 of Simetría4
    # the kernel refuses this fillet: 10 mm, written as the material it adds along each edge
    with BuildSketch(Plane(origin=(-6.503247995, 4.122834646, 0), x_dir=(-0.987404963998654, -0.15821326452234308, 0), z_dir=(0, 0, 1))) as redondeo21_of_simetr_a4_piece_1:
        with BuildLine():
            CenterArc((3.465979652, -10), REDONDEO21_OF_SIMETR_A4_R, 90, 31.449927224)
            ThreePointArc((-1.751552481, -1.469035316), (-0.82095501, -0.79988182), (0, 0))
            Line((0, 0), (3.465979652, 0))
        make_face()
    extrude(amount=7.1)

    # Redondeo22
    redondeo22_edges = [part_2.edges().sort_by_distance(p)[0] for p in [
        (-22.351285679, 0.214430699, 16.675),
        (-22.877081636, 1.619257596, 17.55),
        (-22.351285679, 0.214430699, 5.45),
        (-22.877081636, 1.619257596, 5.45),
    ]]
    fillet(redondeo22_edges, radius=REDONDEO22_R)

    # Redondeo23
    # the kernel refuses this fillet: 0.5 mm, written as the material it takes off along each edge
    with BuildSketch(Plane(origin=(-14.452949638, 2.345322166, 15.456143373), x_dir=(0.6865355669299714, 0.7270962215141423, 0), z_dir=(0, 0, 1)), Plane(origin=(-14.452949638, 2.345322166, 7.543856627), x_dir=(-0.07424921960505192, -0.9972397171132128, 0), z_dir=(0, 0, -1))) as redondeo23_piece_1:
        with BuildLine():
            CenterArc((REDONDEO23_R * 0.355085301889, -REDONDEO23_R), REDONDEO23_R, 90, 39.09840529)
            Line((-REDONDEO23_R * 0.27556890564, -REDONDEO23_R * 0.223936039667), (0, 0))
            Line((0, 0), (REDONDEO23_R * 0.355085301889, 0))
        make_face()
    extrude(amount=4.543856627, mode=Mode.SUBTRACT)
    with BuildSketch(Plane(origin=(-14.540190028, 1.173598315, 17.75), x_dir=(0.07424921960503571, 0.9972397171132141, 0), z_dir=(0, 0, 1))) as redondeo23_piece_2:
        with BuildLine():
            CenterArc((0.145764239, -0.5), REDONDEO23_R, 90, 31.602213252)
            ThreePointArc((-0.116245165, -0.074146654), (-0.057821878, -0.037544763), (0, 0))
            Line((0, 0), (0.145764239, 0))
        make_face()
    extrude(amount=2.25, mode=Mode.SUBTRACT)
    with BuildSketch(Plane(origin=(-14.540190028, 1.173598315, 7.464410597), x_dir=(0.07424921960503526, 0.9972397171132141, 0), z_dir=(0, 0, -1))) as redondeo23_piece_3_section:
        with BuildLine():
            CenterArc((0.145764239, 0.5), REDONDEO23_R, 238.397786748, 31.602213252)
            ThreePointArc((-0.116245165, 0.074146654), (-0.057821878, 0.037544763), (0, 0))
            Line((0, 0), (0.145764239, 0))
        make_face()
    redondeo23_piece_3 = extrude(amount=4.464410597, mode=Mode.PRIVATE)
    redondeo23_piece_3 = redondeo23_piece_3 - Plane(origin=(-14.040190028, 1.3, 7.464410597), x_dir=(0, 1, 0), z_dir=(0, 0, 1)) * Cylinder(0.5, 10, mode=Mode.PRIVATE)
    add(redondeo23_piece_3, mode=Mode.SUBTRACT)
    with BuildSketch(Plane(origin=(-14.540190028, 1.173598315, 7.1), x_dir=(0.07424921960503526, 0.9972397171132141, 0), z_dir=(0, 0, -1))) as redondeo23_piece_4:
        with BuildLine():
            CenterArc((0.145764239, 0.5), REDONDEO23_R, 238.397786748, 31.602213252)
            ThreePointArc((-0.116245165, 0.074146654), (-0.057821878, 0.037544763), (0, 0))
            Line((0, 0), (0.145764239, 0))
        make_face()
    extrude(amount=4.1, mode=Mode.SUBTRACT)
    with BuildSketch(Plane(origin=(-14.540190028, 1.173598315, 15.535589403), x_dir=(0.07424921960503526, 0.9972397171132141, 0), z_dir=(0, 0, 1))) as redondeo23_piece_5_section:
        with BuildLine():
            CenterArc((0.145764239, -0.5), REDONDEO23_R, 90, 31.602213252)
            ThreePointArc((-0.116245165, -0.074146654), (-0.057821878, -0.037544763), (0, 0))
            Line((0, 0), (0.145764239, 0))
        make_face()
    redondeo23_piece_5 = extrude(amount=2.214410597, mode=Mode.PRIVATE)
    redondeo23_piece_5 = redondeo23_piece_5 - Plane(origin=(-14.040190028, 1.3, 15.535589403), x_dir=(0, 1, 0), z_dir=(0, 0, -1)) * Cylinder(0.5, 6, mode=Mode.PRIVATE)
    add(redondeo23_piece_5, mode=Mode.SUBTRACT)
    with BuildSketch(Plane(origin=(-14.540190028, 1.173598315, 15.9), x_dir=(0.07424921960503526, 0.9972397171132141, 0), z_dir=(0, 0, 1))) as redondeo23_piece_6:
        with BuildLine():
            CenterArc((0.145764239, -0.5), REDONDEO23_R, 90, 31.602213252)
            ThreePointArc((-0.116245165, -0.074146654), (-0.057821878, -0.037544763), (0, 0))
            Line((0, 0), (0.145764239, 0))
        make_face()
    extrude(amount=1.85, mode=Mode.SUBTRACT)


solid = part_2.part
